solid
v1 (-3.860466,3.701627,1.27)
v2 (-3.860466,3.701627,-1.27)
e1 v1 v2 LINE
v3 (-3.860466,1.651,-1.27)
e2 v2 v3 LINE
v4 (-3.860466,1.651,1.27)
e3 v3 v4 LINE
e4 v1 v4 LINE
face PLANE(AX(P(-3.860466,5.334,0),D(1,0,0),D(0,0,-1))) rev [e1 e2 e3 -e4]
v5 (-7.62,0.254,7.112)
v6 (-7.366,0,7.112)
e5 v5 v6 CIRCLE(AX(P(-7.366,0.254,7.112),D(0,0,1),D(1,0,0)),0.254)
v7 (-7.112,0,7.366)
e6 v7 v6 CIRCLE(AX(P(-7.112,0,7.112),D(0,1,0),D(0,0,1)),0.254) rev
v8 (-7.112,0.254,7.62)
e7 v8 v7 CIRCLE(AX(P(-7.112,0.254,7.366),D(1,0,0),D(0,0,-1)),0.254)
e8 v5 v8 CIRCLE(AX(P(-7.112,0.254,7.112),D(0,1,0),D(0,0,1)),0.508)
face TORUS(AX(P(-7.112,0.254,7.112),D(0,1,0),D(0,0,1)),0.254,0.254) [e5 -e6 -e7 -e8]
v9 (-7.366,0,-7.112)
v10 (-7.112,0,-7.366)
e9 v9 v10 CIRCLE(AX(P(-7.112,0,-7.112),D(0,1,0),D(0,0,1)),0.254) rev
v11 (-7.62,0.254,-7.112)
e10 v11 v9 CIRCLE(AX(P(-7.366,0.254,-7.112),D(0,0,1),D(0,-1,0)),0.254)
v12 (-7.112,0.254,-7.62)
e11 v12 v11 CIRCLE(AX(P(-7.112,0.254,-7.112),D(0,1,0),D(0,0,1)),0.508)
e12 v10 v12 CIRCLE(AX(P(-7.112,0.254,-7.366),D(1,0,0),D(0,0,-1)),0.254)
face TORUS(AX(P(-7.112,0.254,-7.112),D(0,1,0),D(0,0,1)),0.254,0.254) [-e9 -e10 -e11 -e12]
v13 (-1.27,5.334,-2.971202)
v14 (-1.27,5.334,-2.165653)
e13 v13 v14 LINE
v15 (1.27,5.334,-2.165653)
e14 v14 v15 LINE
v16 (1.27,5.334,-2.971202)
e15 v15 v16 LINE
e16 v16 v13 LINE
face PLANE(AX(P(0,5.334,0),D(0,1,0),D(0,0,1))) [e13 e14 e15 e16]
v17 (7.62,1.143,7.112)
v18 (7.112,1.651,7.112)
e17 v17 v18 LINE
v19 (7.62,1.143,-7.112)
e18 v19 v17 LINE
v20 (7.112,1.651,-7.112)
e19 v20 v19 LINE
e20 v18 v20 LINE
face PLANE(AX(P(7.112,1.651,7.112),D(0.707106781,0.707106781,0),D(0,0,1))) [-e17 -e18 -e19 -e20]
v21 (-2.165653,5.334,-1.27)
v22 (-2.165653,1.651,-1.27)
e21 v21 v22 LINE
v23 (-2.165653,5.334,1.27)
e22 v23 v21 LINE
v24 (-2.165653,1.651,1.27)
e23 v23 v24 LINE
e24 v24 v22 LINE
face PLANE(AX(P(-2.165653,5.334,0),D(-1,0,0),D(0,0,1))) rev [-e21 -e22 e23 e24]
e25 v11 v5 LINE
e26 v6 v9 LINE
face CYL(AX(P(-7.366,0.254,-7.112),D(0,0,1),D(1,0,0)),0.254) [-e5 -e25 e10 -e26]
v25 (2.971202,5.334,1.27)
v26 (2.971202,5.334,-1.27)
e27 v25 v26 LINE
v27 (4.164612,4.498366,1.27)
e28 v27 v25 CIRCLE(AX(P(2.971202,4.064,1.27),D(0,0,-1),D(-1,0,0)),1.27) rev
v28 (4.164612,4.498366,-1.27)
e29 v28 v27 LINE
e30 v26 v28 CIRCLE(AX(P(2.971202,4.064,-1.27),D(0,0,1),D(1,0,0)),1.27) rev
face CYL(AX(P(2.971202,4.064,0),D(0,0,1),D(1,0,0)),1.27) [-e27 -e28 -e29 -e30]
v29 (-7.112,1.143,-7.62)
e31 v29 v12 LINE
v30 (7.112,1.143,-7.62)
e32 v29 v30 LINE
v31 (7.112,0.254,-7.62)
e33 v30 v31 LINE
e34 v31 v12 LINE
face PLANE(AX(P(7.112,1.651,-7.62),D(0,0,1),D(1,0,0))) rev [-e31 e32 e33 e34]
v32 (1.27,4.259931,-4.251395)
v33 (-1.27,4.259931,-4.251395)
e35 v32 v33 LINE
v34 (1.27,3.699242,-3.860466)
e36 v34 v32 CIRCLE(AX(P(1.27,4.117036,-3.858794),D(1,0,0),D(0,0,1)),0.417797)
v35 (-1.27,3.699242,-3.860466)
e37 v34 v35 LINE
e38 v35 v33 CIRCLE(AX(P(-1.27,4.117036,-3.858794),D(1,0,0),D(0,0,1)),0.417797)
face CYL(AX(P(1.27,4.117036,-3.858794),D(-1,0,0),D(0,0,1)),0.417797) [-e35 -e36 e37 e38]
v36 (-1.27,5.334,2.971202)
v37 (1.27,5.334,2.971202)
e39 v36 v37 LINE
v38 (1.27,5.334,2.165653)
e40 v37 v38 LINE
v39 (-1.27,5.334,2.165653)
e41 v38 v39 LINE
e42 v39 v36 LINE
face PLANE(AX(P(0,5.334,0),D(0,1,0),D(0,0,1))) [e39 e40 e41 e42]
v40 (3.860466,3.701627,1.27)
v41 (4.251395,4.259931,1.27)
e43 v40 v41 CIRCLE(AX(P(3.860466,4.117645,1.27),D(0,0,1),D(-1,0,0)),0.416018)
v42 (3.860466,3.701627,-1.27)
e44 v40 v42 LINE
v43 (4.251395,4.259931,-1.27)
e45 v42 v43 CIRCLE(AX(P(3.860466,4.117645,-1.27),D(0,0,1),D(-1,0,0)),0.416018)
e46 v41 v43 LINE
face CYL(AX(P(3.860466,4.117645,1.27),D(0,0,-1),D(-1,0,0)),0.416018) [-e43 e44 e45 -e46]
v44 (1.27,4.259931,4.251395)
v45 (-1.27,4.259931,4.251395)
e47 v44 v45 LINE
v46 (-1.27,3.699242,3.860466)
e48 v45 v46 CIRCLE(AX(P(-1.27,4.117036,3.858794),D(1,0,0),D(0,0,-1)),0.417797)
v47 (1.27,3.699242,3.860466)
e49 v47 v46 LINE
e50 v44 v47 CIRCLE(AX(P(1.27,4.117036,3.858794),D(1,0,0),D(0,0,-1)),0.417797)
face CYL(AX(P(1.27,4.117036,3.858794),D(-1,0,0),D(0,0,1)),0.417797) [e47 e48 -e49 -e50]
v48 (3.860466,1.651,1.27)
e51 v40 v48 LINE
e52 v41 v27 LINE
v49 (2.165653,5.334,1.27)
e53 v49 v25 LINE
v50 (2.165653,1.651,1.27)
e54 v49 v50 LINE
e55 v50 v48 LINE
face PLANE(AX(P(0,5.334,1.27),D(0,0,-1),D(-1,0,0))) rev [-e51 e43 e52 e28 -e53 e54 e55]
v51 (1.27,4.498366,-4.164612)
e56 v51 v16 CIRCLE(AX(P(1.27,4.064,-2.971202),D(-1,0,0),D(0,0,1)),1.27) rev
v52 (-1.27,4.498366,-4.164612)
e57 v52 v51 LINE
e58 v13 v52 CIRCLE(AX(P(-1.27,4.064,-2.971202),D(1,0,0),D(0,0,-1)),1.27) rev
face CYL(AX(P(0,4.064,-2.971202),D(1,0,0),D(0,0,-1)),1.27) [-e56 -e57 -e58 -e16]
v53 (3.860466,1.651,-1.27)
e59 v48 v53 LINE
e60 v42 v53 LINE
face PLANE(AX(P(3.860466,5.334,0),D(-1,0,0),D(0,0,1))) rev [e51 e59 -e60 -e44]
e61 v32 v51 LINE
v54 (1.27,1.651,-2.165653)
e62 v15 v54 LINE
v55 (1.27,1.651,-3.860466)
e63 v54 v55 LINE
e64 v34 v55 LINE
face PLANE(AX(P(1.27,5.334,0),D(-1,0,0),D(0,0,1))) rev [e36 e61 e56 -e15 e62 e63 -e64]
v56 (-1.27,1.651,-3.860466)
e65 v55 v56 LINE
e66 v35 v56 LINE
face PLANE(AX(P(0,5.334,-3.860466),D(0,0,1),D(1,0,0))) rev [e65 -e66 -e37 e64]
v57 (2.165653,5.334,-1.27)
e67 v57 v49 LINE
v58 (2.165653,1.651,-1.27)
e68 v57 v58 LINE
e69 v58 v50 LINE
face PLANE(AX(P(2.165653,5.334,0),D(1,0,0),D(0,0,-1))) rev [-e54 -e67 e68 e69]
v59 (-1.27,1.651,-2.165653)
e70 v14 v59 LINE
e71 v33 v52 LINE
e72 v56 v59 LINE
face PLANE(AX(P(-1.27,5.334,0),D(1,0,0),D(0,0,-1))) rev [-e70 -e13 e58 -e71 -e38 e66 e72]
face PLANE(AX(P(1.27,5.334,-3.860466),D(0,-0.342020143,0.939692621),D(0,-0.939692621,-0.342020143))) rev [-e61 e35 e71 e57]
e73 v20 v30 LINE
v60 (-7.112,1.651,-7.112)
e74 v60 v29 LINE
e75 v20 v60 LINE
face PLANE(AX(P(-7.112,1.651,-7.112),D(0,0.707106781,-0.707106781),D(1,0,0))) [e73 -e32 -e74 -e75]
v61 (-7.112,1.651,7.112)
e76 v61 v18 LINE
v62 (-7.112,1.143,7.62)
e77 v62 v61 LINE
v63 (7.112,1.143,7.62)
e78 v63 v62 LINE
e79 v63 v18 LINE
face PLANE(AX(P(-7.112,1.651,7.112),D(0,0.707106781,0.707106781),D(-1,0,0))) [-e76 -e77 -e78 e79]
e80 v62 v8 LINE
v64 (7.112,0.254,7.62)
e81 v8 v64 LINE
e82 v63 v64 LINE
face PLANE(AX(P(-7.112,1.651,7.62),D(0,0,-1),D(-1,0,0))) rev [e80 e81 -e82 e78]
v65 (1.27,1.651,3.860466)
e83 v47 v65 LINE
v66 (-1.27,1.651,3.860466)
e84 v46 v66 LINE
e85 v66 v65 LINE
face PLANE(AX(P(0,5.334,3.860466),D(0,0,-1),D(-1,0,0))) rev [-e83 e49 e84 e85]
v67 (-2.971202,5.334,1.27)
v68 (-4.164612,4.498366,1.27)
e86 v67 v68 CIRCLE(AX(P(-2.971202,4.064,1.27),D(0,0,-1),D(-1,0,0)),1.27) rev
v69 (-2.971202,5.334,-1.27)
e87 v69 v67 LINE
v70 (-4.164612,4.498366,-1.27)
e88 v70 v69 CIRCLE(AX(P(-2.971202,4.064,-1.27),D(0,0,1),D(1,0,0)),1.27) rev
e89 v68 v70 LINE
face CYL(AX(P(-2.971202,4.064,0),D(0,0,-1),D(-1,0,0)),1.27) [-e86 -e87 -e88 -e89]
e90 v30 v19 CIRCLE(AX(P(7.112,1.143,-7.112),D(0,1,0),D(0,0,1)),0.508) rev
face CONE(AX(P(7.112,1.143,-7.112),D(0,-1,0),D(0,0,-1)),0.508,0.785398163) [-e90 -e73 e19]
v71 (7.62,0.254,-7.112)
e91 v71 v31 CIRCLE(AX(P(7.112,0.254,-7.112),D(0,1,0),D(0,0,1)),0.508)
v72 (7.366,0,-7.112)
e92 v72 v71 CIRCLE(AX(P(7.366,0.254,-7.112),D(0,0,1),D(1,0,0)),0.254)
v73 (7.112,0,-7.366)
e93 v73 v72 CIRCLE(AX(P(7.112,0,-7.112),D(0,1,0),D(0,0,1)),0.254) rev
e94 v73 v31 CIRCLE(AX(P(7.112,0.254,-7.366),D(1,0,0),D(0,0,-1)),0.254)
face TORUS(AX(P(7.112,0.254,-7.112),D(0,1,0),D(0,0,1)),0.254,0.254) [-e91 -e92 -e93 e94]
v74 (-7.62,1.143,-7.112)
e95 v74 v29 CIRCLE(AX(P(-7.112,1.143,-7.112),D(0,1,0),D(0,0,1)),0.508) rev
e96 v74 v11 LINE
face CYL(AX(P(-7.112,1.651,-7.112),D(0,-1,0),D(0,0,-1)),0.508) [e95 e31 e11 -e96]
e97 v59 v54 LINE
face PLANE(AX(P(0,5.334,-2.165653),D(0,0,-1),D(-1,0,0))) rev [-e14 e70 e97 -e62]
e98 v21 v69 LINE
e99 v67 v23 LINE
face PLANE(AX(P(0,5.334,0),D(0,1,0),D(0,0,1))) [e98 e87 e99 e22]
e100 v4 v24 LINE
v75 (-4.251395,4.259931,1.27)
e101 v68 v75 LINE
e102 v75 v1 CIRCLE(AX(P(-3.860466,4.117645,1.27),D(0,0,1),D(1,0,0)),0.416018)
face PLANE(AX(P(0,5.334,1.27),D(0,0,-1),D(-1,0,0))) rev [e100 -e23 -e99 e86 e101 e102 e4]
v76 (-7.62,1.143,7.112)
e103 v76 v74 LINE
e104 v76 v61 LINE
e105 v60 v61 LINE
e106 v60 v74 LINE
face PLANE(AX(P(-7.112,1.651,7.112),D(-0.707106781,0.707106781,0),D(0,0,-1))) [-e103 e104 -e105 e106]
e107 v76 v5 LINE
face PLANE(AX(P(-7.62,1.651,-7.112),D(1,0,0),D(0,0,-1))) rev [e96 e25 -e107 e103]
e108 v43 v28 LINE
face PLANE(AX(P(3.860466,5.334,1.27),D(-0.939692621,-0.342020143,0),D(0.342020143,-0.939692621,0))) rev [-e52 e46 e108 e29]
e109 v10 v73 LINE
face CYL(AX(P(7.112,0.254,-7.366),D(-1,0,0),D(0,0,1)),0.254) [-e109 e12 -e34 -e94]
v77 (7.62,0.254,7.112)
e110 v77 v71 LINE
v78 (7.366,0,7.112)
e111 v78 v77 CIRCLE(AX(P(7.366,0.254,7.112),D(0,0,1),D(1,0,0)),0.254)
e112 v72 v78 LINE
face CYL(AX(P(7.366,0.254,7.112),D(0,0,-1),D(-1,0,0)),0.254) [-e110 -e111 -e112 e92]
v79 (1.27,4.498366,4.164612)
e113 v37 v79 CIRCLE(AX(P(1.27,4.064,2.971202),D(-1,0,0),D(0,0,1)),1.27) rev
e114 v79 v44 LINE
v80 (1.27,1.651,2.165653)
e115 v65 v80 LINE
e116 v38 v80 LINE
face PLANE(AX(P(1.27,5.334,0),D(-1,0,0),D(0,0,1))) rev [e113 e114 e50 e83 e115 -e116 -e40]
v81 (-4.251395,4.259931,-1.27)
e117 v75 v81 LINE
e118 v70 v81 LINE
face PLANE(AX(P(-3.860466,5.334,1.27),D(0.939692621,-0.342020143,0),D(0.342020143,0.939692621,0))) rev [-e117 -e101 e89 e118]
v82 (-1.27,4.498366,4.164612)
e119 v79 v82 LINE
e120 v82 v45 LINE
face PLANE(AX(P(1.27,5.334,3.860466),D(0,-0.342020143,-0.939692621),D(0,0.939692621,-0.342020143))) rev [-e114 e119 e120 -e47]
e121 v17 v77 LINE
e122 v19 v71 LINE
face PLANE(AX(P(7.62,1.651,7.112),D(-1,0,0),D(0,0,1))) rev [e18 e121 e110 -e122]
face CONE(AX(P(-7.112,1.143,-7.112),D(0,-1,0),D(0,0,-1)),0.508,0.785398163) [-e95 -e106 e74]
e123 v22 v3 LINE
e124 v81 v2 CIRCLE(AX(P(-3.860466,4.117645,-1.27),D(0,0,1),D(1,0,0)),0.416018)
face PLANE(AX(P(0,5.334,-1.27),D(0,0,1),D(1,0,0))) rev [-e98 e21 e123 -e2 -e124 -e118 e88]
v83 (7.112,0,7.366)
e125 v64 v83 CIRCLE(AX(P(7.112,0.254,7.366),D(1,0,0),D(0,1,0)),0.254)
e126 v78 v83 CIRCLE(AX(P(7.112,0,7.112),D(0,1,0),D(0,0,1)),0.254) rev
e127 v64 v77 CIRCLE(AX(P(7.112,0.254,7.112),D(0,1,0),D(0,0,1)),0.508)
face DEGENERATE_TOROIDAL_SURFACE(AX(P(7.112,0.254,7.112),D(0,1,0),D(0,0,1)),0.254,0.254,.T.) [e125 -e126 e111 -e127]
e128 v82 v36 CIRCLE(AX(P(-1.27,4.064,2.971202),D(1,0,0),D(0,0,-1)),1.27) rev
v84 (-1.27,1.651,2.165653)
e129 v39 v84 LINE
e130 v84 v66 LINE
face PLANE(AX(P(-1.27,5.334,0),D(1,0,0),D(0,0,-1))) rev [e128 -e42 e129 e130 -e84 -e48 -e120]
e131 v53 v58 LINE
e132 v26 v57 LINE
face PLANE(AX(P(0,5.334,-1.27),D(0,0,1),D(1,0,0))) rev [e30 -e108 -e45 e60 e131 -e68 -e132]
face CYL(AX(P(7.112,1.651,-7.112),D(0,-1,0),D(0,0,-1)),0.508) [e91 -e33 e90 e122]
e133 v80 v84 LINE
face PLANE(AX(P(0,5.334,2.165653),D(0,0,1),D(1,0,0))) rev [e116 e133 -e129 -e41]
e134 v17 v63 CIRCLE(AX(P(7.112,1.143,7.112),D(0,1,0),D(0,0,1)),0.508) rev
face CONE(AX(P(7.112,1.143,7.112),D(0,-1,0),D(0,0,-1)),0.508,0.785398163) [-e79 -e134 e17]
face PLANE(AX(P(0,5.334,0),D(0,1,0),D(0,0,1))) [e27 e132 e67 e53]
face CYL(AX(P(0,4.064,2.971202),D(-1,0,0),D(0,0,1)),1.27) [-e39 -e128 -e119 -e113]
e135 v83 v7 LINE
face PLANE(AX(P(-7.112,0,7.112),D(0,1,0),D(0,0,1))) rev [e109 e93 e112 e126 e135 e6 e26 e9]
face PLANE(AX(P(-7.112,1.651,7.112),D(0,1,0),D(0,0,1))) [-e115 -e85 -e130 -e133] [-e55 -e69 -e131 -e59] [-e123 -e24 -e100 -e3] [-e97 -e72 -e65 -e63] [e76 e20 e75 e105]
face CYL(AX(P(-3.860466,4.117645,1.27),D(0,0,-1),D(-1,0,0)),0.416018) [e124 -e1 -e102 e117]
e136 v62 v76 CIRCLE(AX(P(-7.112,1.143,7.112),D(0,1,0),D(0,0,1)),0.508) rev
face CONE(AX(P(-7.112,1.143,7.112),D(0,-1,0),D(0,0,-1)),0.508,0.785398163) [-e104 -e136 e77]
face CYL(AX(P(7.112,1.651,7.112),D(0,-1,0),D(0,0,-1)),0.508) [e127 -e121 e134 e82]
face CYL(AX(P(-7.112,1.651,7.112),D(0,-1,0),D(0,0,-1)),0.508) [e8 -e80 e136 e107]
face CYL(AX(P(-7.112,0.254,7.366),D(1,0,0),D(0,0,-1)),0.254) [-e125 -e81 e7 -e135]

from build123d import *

# Parameters (mm, degrees)
BOSS_EXTRUDE1_DEPTH = 1.651
SKETCH3_W           = 2.54
SKETCH3_H           = 1.694812446
SKETCH3_W_2         = 1.694812446
SKETCH3_H_2         = 2.54
BOSS_EXTRUDE2_DEPTH = 3.683
BOSS_EXTRUDE3_DEPTH = 1.27
BOSS_EXTRUDE4_DEPTH = 1.27
FILLET1_R           = 1.27
CHAMFER1_SIZE       = 0.508
FILLET2_R           = 0.254


with BuildPart() as part:
    # Sketch1 → Boss-Extrude1 (new body)
    with BuildSketch(Plane(origin=(0, 0, 0), x_dir=(1, 0, 0), z_dir=(0, 1, 0))):
        with BuildLine():
            Line((-7.62, 7.112), (-7.62, -7.112))
            ThreePointArc((-7.62, -7.112), (-7.471210245, -7.471210245), (-7.112, -7.62))
            Line((-7.112, -7.62), (7.112, -7.62))
            ThreePointArc((7.112, -7.62), (7.471210245, -7.471210245), (7.62, -7.112))
            Line((7.62, -7.112), (7.62, 7.112))
            ThreePointArc((7.62, 7.112), (7.471210245, 7.471210245), (7.112, 7.62))
            Line((7.112, 7.62), (-7.112, 7.62))
            ThreePointArc((-7.112, 7.62), (-7.471210245, 7.471210245), (-7.62, 7.112))
        make_face()
    extrude(amount=BOSS_EXTRUDE1_DEPTH)

    # Sketch3 → Boss-Extrude2 (add)
    with BuildSketch(Plane(origin=(0, 1.651, 0), x_dir=(1, 0, 0), z_dir=(0, 1, 0))):
        with Locations((0, 3.013059552)):
            Rectangle(SKETCH3_W, SKETCH3_H)
        with Locations((3.013059552, 0)):
            Rectangle(SKETCH3_W_2, SKETCH3_H_2)
        with Locations((0, -3.013059552)):
            Rectangle(SKETCH3_W, SKETCH3_H)
        with Locations((-3.013059552, 0)):
            Rectangle(SKETCH3_W_2, SKETCH3_H_2)
    extrude(amount=BOSS_EXTRUDE2_DEPTH)

    # Sketch4 → Boss-Extrude3 (add, symmetric)
    with BuildSketch(Plane.XY):
        with BuildLine():
            Line((-3.860465775, 5.334), (-4.251394799, 4.259931334))
            ThreePointArc((-4.251394799, 4.259931334), (-4.201247752, 3.879026697), (-3.860465775, 3.701626828))
            Line((-3.860465775, 3.701626828), (-3.860465775, 5.334))
        make_face()
        with BuildLine():
            Line((3.860465775, 5.334), (4.251394799, 4.259931334))
            ThreePointArc((4.251394799, 4.259931334), (4.201247752, 3.879026697), (3.860465775, 3.701626828))
            Line((3.860465775, 3.701626828), (3.860465775, 5.334))
        make_face()
    extrude(amount=BOSS_EXTRUDE3_DEPTH, both=True)

    # Sketch5 → Boss-Extrude4 (add, symmetric)
    with BuildSketch(Plane(origin=(0, 0, 0), x_dir=(0, 0, -1), z_dir=(1, 0, 0))):
        with BuildLine():
            Line((-3.860465775, 5.334), (-4.251394799, 4.259931334))
            ThreePointArc((-4.251394799, 4.259931334), (-4.201512131, 3.878082751), (-3.860465775, 3.699242027))
            Line((-3.860465775, 3.699242027), (-3.860465775, 5.334))
        make_face()
        with BuildLine():
            Line((3.860465775, 5.334), (4.251394799, 4.259931334))
            ThreePointArc((4.251394799, 4.259931334), (4.201512131, 3.878082751), (3.860465775, 3.699242027))
            Line((3.860465775, 3.699242027), (3.860465775, 5.334))
        make_face()
    extrude(amount=BOSS_EXTRUDE4_DEPTH, both=True)

    # Fillet1
    fillet1_edges = [part.edges().sort_by_distance(p)[0] for p in [
        (0, 5.334, -3.860465775),
        (3.860465775, 5.334, 0),
        (0, 5.334, 3.860465775),
        (-3.860465775, 5.334, 0),
    ]]
    fillet(fillet1_edges, radius=FILLET1_R)

    # Chamfer1
    chamfer1_edges = [part.edges().sort_by_distance(p)[0] for p in [
        (7.471210245, 1.651, 7.471210245),
        (7.62, 1.651, 0),
        (7.471210245, 1.651, -7.471210245),
        (0, 1.651, -7.62),
        (-7.471210245, 1.651, -7.471210245),
        (-7.62, 1.651, 0),
        (-7.471210245, 1.651, 7.471210245),
        (0, 1.651, 7.62),
    ]]
    chamfer(chamfer1_edges, length=CHAMFER1_SIZE - 0.0001)  # a hair under: the kernel refuses the full size

    # Fillet2
    fillet2_edges = [part.edges().sort_by_distance(p)[0] for p in [
        (0, 0, 7.62),
        (-7.471210245, 0, 7.471210245),
        (-7.62, 0, 0),
        (-7.471210245, 0, -7.471210245),
        (0, 0, -7.62),
        (7.471210245, 0, -7.471210245),
        (7.62, 0, 0),
        (7.471210245, 0, 7.471210245),
    ]]
    fillet(fillet2_edges, radius=FILLET2_R)


solid = part.part
